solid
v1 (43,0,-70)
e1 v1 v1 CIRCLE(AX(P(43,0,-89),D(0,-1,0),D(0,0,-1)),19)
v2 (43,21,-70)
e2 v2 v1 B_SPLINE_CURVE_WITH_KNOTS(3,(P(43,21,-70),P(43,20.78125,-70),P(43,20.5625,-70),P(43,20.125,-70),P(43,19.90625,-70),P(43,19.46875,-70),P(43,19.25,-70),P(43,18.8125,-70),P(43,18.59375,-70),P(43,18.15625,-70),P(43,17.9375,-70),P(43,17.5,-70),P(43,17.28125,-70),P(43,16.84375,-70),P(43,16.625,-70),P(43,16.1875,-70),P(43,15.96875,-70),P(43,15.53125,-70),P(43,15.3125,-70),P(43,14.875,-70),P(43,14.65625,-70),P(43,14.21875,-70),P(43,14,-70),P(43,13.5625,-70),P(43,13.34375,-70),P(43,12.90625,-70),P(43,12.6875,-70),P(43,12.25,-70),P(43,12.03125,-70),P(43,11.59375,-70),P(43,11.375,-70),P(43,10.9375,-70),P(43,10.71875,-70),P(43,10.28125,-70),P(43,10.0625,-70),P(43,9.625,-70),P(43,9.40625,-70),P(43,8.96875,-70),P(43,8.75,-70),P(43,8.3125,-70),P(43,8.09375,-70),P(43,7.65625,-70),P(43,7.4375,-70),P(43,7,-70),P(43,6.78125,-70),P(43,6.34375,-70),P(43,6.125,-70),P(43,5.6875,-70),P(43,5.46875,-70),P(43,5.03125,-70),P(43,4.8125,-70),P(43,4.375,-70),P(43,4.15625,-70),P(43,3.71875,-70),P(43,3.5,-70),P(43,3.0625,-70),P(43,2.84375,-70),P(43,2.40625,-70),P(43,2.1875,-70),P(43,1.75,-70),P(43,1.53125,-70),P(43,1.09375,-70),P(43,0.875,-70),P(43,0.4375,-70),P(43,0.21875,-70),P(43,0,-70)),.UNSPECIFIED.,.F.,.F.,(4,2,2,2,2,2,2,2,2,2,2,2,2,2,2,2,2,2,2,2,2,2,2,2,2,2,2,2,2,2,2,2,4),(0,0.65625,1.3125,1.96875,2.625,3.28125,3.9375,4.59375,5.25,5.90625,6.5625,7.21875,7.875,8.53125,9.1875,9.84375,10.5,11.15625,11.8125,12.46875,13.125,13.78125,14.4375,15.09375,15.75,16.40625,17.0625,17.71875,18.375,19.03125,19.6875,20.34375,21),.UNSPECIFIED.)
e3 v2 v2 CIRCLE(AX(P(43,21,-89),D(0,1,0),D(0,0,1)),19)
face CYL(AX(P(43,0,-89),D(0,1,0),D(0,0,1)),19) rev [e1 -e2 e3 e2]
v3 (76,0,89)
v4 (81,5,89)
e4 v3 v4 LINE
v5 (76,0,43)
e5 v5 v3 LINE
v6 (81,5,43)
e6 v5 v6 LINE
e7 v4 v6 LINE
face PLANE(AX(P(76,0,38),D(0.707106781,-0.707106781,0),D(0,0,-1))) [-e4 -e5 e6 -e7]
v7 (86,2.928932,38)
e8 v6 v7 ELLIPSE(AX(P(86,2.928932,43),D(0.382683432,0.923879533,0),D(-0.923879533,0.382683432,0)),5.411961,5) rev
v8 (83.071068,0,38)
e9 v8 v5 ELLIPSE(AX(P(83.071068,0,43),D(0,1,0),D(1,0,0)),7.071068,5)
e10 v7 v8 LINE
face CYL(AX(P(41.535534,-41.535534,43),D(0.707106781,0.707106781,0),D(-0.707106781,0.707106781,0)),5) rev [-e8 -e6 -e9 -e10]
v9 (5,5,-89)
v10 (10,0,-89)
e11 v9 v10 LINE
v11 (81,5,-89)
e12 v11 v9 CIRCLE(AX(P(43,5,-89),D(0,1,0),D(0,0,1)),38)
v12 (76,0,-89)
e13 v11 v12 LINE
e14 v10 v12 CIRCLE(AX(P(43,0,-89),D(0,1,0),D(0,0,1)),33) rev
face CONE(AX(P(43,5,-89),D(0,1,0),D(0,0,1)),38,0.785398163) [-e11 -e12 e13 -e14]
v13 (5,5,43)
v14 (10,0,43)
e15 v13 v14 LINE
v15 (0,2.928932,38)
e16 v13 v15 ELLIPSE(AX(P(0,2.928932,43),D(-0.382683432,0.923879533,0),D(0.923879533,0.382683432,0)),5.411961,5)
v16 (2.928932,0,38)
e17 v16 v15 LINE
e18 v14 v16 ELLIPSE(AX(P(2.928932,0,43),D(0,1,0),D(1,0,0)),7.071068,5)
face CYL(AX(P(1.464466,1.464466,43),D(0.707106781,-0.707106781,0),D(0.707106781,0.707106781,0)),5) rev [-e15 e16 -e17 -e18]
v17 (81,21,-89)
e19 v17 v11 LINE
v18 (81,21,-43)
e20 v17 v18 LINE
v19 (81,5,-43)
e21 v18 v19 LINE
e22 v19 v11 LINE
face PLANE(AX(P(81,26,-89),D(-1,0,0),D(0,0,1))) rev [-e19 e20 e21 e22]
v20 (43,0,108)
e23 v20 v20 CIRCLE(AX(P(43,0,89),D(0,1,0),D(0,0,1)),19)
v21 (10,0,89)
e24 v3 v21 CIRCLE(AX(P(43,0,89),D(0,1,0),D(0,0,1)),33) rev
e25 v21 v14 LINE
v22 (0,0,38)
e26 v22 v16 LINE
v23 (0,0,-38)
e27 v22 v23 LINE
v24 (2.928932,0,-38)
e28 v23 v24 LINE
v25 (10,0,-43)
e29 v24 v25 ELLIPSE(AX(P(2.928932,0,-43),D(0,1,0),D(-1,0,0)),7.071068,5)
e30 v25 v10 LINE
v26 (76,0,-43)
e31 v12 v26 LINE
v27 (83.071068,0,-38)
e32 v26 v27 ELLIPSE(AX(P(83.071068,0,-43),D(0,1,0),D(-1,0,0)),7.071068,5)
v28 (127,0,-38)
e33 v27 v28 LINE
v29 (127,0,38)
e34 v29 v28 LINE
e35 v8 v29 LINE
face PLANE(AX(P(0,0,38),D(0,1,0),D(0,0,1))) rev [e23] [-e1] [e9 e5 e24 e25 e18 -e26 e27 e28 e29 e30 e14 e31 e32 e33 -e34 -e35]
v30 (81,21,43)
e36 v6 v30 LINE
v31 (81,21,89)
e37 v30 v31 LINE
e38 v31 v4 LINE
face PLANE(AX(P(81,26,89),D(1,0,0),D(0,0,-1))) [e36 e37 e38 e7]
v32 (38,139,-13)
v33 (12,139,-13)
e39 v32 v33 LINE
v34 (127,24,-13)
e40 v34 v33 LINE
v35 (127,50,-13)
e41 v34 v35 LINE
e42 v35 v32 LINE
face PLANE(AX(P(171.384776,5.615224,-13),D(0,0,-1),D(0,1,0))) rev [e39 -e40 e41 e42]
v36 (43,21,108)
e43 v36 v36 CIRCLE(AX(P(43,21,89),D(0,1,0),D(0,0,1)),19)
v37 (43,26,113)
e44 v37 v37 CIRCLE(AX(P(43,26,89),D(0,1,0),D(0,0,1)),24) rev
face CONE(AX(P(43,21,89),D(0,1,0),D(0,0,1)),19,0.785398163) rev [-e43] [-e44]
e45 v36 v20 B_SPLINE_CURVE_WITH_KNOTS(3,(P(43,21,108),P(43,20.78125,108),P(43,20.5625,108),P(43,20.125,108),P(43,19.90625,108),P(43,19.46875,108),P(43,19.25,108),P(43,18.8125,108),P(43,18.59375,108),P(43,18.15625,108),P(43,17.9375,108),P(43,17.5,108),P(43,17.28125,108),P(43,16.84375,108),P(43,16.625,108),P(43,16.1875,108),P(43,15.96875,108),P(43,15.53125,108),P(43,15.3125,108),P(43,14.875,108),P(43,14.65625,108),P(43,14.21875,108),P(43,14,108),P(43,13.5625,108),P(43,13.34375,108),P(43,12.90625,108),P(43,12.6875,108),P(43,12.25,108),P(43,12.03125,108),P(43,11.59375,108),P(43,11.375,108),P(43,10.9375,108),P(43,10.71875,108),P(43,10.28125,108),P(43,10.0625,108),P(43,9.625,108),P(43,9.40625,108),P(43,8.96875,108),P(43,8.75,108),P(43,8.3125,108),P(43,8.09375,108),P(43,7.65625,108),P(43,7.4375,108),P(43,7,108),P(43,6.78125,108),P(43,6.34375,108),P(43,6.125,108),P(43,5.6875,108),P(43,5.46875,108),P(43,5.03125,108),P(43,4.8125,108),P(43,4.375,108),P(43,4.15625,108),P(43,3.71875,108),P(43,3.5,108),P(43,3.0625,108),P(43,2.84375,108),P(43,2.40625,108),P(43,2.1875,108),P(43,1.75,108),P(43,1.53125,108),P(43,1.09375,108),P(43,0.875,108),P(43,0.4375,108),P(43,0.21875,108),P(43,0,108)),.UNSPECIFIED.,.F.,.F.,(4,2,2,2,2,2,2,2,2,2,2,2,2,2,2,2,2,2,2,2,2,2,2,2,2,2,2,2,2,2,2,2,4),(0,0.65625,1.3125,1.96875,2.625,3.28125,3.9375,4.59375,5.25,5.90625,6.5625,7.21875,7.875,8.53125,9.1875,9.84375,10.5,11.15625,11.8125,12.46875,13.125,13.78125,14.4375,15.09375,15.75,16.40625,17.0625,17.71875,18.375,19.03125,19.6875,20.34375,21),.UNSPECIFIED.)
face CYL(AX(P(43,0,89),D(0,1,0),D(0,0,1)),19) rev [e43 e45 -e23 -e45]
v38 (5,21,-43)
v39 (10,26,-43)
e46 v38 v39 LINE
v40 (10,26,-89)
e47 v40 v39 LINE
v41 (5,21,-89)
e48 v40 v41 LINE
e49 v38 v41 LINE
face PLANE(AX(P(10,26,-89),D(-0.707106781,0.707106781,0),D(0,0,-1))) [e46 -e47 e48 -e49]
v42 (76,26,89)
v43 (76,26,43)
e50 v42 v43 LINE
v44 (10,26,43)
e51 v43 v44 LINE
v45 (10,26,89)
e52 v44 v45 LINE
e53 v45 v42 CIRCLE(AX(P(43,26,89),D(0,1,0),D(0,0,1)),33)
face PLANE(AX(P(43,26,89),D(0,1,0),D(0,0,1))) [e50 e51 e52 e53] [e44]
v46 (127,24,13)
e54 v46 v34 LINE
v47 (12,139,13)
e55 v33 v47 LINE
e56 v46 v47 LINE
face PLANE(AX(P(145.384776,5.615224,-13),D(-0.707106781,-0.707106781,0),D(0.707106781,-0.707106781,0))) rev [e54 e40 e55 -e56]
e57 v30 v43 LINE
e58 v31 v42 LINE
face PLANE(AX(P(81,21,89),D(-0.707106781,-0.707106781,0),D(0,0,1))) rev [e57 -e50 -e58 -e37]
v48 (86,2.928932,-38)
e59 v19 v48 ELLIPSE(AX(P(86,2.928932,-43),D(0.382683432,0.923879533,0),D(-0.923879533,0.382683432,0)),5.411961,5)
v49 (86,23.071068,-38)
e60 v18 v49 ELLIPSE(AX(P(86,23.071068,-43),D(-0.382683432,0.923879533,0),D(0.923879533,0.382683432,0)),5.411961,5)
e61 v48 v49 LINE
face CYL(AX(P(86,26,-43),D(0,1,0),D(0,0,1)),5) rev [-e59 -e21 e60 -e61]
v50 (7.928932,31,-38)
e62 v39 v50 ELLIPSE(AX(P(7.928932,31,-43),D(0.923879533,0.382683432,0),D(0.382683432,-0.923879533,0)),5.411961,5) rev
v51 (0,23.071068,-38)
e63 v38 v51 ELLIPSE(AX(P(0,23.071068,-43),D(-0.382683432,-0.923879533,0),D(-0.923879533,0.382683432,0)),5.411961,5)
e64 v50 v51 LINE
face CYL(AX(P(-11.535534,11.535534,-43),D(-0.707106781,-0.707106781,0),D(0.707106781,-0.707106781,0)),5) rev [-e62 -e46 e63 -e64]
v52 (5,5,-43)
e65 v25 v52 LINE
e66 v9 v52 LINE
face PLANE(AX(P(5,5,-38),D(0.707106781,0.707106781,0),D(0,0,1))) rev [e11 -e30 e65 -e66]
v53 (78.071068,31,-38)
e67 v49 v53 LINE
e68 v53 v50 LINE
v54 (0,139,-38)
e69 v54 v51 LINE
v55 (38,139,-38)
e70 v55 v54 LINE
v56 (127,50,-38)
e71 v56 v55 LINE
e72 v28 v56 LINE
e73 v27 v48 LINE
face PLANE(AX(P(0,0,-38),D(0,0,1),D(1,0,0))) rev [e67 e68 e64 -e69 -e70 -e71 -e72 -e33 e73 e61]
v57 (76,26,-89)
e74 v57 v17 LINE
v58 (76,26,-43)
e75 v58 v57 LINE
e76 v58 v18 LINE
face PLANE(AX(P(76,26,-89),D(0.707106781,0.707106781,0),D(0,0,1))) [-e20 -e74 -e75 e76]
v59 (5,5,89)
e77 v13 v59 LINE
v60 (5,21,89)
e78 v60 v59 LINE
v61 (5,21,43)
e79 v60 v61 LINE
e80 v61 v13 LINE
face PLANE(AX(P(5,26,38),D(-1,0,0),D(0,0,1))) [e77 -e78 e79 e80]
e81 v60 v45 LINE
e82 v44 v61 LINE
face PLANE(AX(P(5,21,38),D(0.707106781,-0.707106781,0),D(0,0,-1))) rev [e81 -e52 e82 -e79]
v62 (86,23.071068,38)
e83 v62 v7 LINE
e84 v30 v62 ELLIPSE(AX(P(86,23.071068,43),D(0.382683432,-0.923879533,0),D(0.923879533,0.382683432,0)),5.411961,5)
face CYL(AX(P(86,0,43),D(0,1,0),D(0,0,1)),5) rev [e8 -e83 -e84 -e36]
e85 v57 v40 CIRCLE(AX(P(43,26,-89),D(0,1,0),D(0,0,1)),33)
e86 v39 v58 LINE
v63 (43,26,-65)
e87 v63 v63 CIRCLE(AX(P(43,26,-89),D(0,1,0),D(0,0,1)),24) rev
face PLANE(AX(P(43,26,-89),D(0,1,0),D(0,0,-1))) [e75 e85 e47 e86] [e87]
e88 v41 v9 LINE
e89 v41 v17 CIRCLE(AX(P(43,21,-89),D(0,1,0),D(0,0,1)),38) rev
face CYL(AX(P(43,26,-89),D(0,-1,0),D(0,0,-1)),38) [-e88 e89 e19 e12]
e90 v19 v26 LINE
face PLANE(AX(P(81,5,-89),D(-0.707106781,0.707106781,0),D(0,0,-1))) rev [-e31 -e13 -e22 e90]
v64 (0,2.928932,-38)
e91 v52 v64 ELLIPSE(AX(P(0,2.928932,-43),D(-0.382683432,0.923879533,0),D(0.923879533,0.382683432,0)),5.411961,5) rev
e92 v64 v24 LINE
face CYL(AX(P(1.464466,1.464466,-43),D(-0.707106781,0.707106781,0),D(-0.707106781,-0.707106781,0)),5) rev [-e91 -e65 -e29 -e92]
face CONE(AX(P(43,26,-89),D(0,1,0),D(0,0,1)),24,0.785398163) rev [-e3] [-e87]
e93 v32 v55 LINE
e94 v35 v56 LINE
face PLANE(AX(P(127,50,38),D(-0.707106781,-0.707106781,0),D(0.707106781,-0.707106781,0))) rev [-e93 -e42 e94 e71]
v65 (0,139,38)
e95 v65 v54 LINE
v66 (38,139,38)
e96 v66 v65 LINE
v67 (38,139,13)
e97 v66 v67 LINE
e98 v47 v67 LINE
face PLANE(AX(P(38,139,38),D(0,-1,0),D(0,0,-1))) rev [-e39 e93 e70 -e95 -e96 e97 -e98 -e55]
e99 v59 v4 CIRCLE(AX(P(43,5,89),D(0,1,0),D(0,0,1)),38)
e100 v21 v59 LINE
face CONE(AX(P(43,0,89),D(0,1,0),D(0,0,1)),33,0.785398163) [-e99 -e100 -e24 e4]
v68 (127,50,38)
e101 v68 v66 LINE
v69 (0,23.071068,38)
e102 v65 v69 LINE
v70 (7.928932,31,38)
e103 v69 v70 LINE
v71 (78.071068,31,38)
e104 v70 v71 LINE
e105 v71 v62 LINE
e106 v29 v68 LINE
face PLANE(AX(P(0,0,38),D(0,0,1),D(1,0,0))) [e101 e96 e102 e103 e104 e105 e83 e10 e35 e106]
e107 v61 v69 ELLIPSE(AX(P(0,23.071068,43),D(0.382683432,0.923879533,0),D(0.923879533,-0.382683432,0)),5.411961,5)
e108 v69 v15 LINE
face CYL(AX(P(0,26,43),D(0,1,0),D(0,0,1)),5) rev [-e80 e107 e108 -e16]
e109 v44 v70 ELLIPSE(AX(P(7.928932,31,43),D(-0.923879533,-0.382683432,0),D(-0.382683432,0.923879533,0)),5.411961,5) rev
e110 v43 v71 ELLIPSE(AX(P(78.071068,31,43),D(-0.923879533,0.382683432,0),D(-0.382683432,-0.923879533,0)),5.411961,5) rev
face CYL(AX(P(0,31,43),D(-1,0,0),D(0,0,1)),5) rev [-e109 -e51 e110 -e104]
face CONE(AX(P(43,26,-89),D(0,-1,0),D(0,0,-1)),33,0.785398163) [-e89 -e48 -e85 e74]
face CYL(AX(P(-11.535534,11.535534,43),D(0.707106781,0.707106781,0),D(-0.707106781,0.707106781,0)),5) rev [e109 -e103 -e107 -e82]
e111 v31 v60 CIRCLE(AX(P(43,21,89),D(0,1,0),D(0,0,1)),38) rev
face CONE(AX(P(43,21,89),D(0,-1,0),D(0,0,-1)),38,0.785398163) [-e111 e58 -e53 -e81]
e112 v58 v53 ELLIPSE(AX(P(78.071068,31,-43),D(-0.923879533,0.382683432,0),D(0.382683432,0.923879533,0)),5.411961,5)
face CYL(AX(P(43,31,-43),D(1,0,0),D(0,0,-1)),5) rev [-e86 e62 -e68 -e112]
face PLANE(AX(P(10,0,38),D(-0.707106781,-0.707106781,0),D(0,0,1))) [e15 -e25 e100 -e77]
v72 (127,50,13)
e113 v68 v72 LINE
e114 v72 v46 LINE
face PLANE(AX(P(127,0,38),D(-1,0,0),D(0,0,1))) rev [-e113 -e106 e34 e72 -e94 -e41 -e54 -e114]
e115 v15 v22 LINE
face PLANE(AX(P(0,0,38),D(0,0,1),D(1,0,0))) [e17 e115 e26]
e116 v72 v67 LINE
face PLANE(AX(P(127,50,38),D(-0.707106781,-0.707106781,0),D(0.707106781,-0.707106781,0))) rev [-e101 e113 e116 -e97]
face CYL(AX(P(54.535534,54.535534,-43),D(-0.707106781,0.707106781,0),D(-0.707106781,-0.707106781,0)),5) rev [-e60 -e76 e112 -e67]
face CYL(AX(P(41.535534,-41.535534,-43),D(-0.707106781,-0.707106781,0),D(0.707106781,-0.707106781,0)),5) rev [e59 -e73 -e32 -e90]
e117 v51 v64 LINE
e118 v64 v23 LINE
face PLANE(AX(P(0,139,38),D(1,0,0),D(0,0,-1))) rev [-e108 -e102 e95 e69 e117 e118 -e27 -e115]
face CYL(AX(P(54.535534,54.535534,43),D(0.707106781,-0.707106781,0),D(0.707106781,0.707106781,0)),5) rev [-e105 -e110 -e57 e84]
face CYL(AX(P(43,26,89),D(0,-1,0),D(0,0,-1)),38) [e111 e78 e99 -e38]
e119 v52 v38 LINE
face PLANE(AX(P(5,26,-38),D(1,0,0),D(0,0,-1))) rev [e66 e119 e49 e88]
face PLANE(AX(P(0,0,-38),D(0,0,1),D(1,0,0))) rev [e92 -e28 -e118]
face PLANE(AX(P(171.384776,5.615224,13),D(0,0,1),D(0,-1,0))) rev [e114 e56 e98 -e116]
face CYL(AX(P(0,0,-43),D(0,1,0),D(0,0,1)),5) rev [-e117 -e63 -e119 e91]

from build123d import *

# Parameters (mm, degrees)
BOSS_EXTRUDE1_DEPTH      = 38
SKETCH2_W                = 26
SKETCH2_H                = 26
CUT_EXTRUDE1_DEPTH       = 178
BOSS_EXTRUDE2_DEPTH      = 26
CHAMFER2_SIZE            = 5
FILLET4_R                = 5
SKETCH4_R                = 19
CUT_EXTRUDE2_DEPTH       = 26
CHAMFER3_SIZE            = 5
CHAMFER3_OF_MIRROR1_SIZE = 5
CHAMFER4_SIZE            = 5
FILLET5_R                = 5


with BuildPart() as part:
    # Sketch1 → Boss-Extrude1 (new, symmetric)
    with BuildSketch(Plane.XY):
        Polygon((0, 139), (0, 0), (127, 0), (127, 50), (38, 139), align=None)
    extrude(amount=BOSS_EXTRUDE1_DEPTH, both=True)

    # Sketch2 → Cut-Extrude1 (cut, along a direction that is not the sketch's normal)
    with BuildSketch(Plane(origin=(0, 139, 0), x_dir=(1, 0, 0), z_dir=(0, 1, 0))):
        with Locations((25, 0)):
            Rectangle(SKETCH2_W, SKETCH2_H)
    extrude(amount=-CUT_EXTRUDE1_DEPTH, dir=(-0.7071067811865489, 0.7071067811865462, 0), mode=Mode.SUBTRACT)

    # Sketch3 → Boss-Extrude2 (add)
    with BuildSketch(Plane.XZ):
        with BuildLine():
            Line((5, 38), (5, 89))
            ThreePointArc((5, 89), (43, 127), (81, 89))
            Line((81, 89), (81, 38))
            Line((81, 38), (5, 38))
        make_face()
    boss_extrude2 = extrude(amount=-BOSS_EXTRUDE2_DEPTH)

    # Chamfer2
    chamfer2_edges = [part.edges().sort_by_distance(p)[0] for p in [
        (5, 26, 63.5),
        (43, 26, 127),
        (81, 26, 63.5),
        (81, 0, 63.5),
        (43, 0, 127),
        (5, 0, 63.5),
    ]]
    chamfer(chamfer2_edges, length=CHAMFER2_SIZE)

    # Fillet4
    fillet4_edges = [part.edges().sort_by_distance(p)[0] for p in [
        (5, 13, 38),
        (81, 13, 38),
        (43, 26, 38),
        (7.5, 2.5, 38),
        (78.5, 2.5, 38),
        (7.5, 23.5, 38),
        (78.5, 23.5, 38),
    ]]
    fillet(fillet4_edges, radius=FILLET4_R - 0.0001)  # a hair under: the kernel refuses the full size

    # Sketch4 → Cut-Extrude2 (cut)
    with BuildSketch(Plane(origin=(0, 26, 0), x_dir=(1, 0, 0), z_dir=(0, 1, 0))):
        with Locations(Location((43, -89, 0), (0, 0, 270))):
            Circle(SKETCH4_R)
    cut_extrude2 = extrude(amount=-CUT_EXTRUDE2_DEPTH, mode=Mode.SUBTRACT)

    # Chamfer3
    chamfer3_edges = [part.edges().sort_by_distance(p)[0] for p in [
        (43, 26, 70),
    ]]
    chamfer(chamfer3_edges, length=CHAMFER3_SIZE)

    # Mirror1: Boss-Extrude2, Cut-Extrude2 across plane
    add(boss_extrude2.mirror(Plane.XY))
    add(cut_extrude2.mirror(Plane.XY), mode=Mode.SUBTRACT)

    # Chamfer3 of Mirror1
    chamfer3_of_mirror1_edges = [part.edges().sort_by_distance(p)[0] for p in [
        (43, 26, -70),
    ]]
    chamfer(chamfer3_of_mirror1_edges, length=CHAMFER3_OF_MIRROR1_SIZE)

    # Chamfer4
    chamfer4_edges = [part.edges().sort_by_distance(p)[0] for p in [
        (81, 0, -63.5),
        (43, 0, -127),
        (5, 0, -63.5),
        (81, 26, -63.5),
        (43, 26, -127),
        (5, 26, -63.5),
    ]]
    chamfer(chamfer4_edges, length=CHAMFER4_SIZE)

    # Fillet5
    fillet5_edges = [part.edges().sort_by_distance(p)[0] for p in [
        (5, 13, -38),
        (81, 13, -38),
        (43, 26, -38),
        (7.5, 2.5, -38),
        (78.5, 2.5, -38),
        (7.5, 23.5, -38),
        (78.5, 23.5, -38),
    ]]
    fillet(fillet5_edges, radius=FILLET5_R - 0.0001)  # a hair under: the kernel refuses the full size


solid = part.part
